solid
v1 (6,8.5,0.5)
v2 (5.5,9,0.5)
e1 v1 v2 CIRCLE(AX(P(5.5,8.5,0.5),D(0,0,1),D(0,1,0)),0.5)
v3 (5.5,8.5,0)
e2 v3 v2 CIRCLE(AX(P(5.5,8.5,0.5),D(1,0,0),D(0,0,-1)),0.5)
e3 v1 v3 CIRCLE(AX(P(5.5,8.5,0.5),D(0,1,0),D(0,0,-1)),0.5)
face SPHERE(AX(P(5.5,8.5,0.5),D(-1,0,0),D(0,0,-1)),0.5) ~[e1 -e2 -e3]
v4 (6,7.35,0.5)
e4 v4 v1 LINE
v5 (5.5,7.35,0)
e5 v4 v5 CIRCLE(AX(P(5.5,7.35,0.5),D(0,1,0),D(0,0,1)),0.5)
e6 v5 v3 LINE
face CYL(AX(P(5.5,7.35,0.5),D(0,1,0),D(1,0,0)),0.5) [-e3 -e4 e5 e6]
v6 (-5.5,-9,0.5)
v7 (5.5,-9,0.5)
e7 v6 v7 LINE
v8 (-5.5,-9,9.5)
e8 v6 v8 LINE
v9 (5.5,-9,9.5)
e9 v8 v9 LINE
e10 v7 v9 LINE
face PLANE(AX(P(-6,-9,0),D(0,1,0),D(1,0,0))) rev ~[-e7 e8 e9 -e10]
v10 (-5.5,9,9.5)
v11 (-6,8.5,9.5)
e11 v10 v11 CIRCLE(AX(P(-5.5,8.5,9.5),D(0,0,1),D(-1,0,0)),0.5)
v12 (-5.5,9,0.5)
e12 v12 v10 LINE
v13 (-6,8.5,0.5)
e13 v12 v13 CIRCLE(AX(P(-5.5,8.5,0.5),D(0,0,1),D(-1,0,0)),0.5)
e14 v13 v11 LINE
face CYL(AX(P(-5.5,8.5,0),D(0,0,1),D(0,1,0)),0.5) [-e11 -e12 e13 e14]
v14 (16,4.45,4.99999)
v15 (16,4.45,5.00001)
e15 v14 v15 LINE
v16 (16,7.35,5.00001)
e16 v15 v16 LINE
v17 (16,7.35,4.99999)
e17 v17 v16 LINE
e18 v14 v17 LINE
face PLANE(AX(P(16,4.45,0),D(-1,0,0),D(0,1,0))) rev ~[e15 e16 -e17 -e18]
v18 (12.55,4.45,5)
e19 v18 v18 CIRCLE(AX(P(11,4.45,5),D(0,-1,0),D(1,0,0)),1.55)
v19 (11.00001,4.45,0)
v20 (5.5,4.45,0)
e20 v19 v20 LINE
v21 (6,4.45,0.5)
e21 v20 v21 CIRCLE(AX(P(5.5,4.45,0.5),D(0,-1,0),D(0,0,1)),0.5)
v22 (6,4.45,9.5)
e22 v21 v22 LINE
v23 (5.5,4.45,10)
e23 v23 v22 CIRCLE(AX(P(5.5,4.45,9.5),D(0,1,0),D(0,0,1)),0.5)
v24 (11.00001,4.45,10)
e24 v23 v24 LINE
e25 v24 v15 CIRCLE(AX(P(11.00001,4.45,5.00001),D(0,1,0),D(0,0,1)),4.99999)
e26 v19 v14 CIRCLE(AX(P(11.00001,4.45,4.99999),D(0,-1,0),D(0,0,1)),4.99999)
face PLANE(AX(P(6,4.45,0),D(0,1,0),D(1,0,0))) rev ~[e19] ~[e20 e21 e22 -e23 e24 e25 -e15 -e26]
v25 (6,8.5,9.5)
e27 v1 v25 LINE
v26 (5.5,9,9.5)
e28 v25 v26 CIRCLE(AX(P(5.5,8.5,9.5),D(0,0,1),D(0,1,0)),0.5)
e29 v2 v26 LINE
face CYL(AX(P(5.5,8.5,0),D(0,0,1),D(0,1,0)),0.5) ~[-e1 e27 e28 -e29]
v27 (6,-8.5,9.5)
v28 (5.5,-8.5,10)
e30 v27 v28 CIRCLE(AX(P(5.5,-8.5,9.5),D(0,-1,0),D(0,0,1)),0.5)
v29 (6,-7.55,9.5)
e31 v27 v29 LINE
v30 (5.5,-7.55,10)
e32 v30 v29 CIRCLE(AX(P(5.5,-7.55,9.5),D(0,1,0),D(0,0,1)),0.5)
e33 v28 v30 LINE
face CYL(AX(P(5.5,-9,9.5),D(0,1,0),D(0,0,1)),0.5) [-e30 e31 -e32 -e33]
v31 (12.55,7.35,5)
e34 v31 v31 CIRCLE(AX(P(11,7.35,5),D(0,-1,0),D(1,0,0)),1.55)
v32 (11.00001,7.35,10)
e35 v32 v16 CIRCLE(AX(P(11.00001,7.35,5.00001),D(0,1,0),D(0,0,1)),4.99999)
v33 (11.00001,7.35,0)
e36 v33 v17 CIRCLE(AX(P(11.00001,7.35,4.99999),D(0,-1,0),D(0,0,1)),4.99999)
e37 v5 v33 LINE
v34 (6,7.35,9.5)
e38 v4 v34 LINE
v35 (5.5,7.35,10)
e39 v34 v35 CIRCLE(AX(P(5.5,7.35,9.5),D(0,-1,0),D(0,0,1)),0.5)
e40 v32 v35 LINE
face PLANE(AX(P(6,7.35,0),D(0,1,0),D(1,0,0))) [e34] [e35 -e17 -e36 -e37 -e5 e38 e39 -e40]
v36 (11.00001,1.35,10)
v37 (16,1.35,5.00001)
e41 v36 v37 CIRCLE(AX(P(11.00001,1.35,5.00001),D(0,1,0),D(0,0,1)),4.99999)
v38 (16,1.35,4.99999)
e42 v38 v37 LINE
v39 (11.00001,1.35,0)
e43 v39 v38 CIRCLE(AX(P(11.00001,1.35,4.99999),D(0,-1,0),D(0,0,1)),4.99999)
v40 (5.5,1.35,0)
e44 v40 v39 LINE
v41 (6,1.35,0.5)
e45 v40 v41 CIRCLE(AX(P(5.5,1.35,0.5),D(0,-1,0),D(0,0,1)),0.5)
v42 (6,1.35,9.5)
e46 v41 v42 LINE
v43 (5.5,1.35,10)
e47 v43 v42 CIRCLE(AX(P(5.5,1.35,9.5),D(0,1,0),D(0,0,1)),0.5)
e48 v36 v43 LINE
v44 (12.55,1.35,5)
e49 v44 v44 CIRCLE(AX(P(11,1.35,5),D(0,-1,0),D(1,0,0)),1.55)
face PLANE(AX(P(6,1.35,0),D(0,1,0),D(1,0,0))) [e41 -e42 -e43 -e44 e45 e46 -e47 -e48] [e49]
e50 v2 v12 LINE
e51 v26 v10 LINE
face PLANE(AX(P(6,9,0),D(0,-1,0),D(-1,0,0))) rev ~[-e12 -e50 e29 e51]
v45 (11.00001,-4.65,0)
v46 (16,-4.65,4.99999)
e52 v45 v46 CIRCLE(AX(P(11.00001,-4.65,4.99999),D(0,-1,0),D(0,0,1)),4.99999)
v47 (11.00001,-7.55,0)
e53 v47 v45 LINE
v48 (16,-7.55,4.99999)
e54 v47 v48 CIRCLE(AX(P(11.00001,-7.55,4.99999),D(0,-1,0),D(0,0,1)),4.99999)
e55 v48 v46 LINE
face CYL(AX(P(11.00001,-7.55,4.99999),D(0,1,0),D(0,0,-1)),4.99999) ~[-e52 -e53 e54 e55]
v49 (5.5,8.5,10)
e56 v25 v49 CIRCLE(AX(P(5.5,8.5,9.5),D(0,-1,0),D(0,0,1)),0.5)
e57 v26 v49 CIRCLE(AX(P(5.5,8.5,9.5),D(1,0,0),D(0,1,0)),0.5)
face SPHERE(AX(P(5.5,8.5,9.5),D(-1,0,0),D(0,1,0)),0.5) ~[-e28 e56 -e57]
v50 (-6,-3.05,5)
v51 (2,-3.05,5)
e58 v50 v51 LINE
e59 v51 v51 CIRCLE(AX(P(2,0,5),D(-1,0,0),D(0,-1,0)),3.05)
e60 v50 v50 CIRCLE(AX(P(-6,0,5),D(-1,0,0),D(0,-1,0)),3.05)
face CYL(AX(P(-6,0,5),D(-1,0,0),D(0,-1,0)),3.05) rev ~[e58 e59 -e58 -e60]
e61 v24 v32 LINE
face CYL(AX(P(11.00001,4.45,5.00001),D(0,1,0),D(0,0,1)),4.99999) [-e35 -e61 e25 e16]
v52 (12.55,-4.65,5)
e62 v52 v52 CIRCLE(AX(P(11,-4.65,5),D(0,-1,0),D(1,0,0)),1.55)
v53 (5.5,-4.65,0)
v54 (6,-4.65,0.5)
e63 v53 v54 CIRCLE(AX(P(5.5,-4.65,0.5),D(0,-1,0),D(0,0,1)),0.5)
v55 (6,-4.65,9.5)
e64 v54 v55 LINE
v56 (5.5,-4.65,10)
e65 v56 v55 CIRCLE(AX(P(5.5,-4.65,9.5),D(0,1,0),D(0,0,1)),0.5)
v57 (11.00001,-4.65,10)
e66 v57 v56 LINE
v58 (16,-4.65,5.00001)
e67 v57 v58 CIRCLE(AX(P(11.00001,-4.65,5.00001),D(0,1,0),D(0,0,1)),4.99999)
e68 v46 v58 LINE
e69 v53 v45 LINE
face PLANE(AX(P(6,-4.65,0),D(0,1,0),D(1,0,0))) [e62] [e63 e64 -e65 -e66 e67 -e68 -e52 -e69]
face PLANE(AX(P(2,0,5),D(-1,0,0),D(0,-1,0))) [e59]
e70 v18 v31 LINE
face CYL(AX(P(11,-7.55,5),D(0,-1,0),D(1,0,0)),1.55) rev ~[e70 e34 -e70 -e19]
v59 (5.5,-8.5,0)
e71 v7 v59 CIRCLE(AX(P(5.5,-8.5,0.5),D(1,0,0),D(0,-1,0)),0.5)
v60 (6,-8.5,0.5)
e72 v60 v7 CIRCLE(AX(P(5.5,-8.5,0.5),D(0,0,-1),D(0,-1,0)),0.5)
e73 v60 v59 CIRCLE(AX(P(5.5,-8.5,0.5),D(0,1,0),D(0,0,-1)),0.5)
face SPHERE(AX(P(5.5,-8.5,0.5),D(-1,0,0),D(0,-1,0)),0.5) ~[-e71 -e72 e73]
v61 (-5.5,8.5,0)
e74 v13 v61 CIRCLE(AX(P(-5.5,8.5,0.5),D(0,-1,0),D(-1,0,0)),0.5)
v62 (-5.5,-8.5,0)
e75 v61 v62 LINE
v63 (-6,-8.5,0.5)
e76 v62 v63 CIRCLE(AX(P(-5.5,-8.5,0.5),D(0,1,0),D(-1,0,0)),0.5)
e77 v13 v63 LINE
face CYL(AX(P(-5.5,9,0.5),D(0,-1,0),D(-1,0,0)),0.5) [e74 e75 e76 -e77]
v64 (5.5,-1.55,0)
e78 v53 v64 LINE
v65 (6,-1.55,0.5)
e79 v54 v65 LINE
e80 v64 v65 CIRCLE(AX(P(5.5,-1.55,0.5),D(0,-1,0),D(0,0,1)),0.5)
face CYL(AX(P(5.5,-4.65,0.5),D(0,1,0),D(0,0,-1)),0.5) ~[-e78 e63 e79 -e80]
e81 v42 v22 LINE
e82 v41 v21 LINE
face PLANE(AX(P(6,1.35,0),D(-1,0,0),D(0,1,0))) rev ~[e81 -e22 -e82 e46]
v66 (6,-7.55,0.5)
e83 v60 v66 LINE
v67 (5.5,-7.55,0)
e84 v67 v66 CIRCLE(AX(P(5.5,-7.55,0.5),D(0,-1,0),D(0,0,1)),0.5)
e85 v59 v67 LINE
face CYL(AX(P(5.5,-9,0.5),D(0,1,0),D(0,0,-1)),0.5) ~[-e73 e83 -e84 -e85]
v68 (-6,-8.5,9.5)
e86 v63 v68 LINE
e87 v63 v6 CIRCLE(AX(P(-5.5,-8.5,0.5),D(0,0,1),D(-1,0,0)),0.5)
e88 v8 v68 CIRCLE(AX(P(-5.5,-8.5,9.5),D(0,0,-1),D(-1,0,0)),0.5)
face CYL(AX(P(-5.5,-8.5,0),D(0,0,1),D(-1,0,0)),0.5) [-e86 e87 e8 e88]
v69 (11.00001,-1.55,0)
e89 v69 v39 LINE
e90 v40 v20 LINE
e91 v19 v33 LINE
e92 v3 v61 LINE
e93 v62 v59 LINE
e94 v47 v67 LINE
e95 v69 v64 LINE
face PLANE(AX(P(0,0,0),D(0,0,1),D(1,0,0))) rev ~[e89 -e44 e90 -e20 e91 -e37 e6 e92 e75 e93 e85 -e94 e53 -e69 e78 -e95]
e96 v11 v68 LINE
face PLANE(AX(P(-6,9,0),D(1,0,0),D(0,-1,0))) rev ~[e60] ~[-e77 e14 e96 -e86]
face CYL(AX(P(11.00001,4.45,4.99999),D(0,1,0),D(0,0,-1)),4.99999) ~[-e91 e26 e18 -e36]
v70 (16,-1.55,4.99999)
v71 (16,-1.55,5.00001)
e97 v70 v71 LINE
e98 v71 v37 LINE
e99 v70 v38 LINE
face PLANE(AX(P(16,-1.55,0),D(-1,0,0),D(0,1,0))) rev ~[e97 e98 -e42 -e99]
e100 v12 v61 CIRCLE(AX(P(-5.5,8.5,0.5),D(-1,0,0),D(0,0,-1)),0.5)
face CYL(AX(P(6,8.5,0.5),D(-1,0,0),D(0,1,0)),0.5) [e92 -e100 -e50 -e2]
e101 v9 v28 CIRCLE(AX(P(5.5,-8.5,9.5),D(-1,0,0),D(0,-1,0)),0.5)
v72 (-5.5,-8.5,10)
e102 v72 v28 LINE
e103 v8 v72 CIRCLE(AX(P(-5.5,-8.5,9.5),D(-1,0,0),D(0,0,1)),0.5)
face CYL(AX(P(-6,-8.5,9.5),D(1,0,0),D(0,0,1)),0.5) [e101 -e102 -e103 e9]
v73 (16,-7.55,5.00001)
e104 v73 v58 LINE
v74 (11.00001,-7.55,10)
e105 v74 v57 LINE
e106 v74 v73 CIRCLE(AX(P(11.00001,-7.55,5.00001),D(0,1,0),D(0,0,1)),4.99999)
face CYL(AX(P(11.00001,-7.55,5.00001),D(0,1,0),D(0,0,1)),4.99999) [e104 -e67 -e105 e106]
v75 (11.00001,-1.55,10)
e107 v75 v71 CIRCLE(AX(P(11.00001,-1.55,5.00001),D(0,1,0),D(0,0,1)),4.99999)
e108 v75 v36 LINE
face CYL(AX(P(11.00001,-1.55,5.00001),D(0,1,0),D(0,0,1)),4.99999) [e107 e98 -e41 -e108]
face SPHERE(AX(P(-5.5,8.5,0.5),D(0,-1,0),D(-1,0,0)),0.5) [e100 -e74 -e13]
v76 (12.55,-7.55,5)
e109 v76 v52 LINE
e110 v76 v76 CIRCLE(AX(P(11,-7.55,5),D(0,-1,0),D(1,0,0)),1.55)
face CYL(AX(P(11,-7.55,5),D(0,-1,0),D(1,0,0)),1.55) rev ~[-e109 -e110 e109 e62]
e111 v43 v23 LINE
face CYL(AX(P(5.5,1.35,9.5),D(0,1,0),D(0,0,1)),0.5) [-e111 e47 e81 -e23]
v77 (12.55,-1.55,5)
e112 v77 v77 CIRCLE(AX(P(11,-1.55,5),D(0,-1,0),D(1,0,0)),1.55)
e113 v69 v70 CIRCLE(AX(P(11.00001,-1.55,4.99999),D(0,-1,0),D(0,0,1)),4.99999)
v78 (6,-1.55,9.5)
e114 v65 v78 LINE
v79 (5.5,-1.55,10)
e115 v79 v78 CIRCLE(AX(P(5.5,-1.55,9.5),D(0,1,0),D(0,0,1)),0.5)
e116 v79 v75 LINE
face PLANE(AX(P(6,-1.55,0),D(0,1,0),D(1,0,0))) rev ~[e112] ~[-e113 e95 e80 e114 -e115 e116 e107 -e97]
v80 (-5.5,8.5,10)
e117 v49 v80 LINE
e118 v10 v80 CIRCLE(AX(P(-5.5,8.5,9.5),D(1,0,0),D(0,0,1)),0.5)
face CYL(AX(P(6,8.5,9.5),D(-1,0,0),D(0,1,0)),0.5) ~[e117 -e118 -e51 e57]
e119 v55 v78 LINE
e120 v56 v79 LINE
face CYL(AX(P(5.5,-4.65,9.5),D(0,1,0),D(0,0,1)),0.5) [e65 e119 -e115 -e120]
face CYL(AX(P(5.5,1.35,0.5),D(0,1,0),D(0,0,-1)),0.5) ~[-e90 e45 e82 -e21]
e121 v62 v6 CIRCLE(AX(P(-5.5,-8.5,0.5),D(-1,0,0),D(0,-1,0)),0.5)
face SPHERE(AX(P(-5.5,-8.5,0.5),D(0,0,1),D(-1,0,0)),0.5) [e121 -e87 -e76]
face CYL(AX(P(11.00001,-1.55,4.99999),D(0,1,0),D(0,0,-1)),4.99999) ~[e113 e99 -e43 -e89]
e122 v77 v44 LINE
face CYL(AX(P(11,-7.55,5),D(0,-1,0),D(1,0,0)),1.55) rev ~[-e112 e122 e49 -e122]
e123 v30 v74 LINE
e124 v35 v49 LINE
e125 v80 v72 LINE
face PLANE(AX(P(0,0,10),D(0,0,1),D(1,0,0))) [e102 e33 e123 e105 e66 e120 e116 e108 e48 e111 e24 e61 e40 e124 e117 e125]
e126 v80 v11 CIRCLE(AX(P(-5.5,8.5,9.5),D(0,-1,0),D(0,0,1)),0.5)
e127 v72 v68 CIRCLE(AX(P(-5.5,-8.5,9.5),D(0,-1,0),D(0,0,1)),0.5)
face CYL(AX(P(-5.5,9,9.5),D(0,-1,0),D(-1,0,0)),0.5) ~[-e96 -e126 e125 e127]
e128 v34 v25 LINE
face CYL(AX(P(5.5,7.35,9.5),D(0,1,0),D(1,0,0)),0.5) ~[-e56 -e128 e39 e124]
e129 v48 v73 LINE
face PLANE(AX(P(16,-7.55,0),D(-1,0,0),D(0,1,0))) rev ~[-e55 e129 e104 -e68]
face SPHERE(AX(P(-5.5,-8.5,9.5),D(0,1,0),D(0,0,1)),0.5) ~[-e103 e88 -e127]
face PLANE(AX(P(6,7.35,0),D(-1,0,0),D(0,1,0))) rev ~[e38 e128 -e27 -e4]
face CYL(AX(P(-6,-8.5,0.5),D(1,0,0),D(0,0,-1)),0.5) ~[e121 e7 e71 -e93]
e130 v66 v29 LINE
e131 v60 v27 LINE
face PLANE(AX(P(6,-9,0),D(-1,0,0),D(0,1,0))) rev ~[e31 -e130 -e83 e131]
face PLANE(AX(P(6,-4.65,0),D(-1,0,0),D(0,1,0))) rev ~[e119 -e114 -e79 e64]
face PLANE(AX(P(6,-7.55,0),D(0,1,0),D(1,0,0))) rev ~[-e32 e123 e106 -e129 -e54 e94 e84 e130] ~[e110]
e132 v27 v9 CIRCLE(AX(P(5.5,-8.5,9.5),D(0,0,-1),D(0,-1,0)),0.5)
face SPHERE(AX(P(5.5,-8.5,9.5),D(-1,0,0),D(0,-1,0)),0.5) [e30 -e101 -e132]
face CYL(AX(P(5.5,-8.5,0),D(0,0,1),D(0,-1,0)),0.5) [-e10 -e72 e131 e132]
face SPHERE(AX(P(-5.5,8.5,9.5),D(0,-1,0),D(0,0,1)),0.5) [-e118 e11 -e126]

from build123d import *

# Parameters (mm, degrees)
F0_W     = 10
F0_H     = 2.9
F1_DEPTH = 10
F2_R     = 3.05
F3_DEPTH = 8
F4_R     = 1.55
F5_DEPTH = 25
F6_R     = 0.5
F7_R     = 4.99999


# Not quite as in the source:
# - a fillet or chamfer is up to 0.001 mm smaller than in the source, because OpenCascade refuses the exact size


with BuildPart() as f1:
    # F0 (on Top) → F1 (new body)
    with BuildSketch(Plane.XY):
        Polygon((6, 9), (-6, 9), (-6, -9), (6, -9), (6, -7.55), (6, -4.65), (6, -1.55), (6, 1.35), (6, 4.45), (6, 7.35), align=None)
        with Locations((11, 5.9)):
            Rectangle(F0_W, F0_H)
        with Locations((11, -0.1)):
            Rectangle(F0_W, F0_H)
        with Locations((11, -6.1)):
            Rectangle(F0_W, F0_H)
    extrude(amount=F1_DEPTH)

    # F2 (on face) → F3 (cut)
    with BuildSketch(Plane(origin=(-6, 0, 0), x_dir=(0, -1, 0), z_dir=(-1, 0, 0))):
        with Locations((0, 5)):
            Circle(F2_R)
    extrude(amount=-F3_DEPTH, mode=Mode.SUBTRACT)

    # F4 (on face) → F5 (cut)
    with BuildSketch(Plane.XZ.offset(7.55)):
        with Locations((11, 5)):
            Circle(F4_R)
    extrude(amount=-F5_DEPTH, mode=Mode.SUBTRACT)

    # F6
    f6_edges = [f1.edges().sort_by_distance(p)[0] for p in [
        (-6, 0, 10),
        (0, -9, 10),
        (0, 9, 10),
        (-6, -9, 5),
        (-6, 0, 0),
        (-6, 9, 5),
        (0, 9, 0),
        (0, -9, 0),
        (6, -9, 5),
        (6, -8.275, 0),
        (6, -3.1, 0),
        (6, 2.9, 0),
        (6, 8.175, 0),
        (6, 9, 5),
        (6, 8.175, 10),
        (6, 2.9, 10),
        (6, -3.1, 10),
        (6, -8.275, 10),
    ]]
    fillet(f6_edges, radius=F6_R)

    # F7 (radius 5 in the source; OpenCascade refuses exactly that, so slightly less here)
    f7_edges = [f1.edges().sort_by_distance(p)[0] for p in [
        (16, 5.9, 0),
        (16, 5.9, 10),
        (16, -0.1, 10),
        (16, -0.1, 0),
        (16, -6.1, 0),
        (16, -6.1, 10),
    ]]
    fillet(f7_edges, radius=F7_R)


solid = f1.part
